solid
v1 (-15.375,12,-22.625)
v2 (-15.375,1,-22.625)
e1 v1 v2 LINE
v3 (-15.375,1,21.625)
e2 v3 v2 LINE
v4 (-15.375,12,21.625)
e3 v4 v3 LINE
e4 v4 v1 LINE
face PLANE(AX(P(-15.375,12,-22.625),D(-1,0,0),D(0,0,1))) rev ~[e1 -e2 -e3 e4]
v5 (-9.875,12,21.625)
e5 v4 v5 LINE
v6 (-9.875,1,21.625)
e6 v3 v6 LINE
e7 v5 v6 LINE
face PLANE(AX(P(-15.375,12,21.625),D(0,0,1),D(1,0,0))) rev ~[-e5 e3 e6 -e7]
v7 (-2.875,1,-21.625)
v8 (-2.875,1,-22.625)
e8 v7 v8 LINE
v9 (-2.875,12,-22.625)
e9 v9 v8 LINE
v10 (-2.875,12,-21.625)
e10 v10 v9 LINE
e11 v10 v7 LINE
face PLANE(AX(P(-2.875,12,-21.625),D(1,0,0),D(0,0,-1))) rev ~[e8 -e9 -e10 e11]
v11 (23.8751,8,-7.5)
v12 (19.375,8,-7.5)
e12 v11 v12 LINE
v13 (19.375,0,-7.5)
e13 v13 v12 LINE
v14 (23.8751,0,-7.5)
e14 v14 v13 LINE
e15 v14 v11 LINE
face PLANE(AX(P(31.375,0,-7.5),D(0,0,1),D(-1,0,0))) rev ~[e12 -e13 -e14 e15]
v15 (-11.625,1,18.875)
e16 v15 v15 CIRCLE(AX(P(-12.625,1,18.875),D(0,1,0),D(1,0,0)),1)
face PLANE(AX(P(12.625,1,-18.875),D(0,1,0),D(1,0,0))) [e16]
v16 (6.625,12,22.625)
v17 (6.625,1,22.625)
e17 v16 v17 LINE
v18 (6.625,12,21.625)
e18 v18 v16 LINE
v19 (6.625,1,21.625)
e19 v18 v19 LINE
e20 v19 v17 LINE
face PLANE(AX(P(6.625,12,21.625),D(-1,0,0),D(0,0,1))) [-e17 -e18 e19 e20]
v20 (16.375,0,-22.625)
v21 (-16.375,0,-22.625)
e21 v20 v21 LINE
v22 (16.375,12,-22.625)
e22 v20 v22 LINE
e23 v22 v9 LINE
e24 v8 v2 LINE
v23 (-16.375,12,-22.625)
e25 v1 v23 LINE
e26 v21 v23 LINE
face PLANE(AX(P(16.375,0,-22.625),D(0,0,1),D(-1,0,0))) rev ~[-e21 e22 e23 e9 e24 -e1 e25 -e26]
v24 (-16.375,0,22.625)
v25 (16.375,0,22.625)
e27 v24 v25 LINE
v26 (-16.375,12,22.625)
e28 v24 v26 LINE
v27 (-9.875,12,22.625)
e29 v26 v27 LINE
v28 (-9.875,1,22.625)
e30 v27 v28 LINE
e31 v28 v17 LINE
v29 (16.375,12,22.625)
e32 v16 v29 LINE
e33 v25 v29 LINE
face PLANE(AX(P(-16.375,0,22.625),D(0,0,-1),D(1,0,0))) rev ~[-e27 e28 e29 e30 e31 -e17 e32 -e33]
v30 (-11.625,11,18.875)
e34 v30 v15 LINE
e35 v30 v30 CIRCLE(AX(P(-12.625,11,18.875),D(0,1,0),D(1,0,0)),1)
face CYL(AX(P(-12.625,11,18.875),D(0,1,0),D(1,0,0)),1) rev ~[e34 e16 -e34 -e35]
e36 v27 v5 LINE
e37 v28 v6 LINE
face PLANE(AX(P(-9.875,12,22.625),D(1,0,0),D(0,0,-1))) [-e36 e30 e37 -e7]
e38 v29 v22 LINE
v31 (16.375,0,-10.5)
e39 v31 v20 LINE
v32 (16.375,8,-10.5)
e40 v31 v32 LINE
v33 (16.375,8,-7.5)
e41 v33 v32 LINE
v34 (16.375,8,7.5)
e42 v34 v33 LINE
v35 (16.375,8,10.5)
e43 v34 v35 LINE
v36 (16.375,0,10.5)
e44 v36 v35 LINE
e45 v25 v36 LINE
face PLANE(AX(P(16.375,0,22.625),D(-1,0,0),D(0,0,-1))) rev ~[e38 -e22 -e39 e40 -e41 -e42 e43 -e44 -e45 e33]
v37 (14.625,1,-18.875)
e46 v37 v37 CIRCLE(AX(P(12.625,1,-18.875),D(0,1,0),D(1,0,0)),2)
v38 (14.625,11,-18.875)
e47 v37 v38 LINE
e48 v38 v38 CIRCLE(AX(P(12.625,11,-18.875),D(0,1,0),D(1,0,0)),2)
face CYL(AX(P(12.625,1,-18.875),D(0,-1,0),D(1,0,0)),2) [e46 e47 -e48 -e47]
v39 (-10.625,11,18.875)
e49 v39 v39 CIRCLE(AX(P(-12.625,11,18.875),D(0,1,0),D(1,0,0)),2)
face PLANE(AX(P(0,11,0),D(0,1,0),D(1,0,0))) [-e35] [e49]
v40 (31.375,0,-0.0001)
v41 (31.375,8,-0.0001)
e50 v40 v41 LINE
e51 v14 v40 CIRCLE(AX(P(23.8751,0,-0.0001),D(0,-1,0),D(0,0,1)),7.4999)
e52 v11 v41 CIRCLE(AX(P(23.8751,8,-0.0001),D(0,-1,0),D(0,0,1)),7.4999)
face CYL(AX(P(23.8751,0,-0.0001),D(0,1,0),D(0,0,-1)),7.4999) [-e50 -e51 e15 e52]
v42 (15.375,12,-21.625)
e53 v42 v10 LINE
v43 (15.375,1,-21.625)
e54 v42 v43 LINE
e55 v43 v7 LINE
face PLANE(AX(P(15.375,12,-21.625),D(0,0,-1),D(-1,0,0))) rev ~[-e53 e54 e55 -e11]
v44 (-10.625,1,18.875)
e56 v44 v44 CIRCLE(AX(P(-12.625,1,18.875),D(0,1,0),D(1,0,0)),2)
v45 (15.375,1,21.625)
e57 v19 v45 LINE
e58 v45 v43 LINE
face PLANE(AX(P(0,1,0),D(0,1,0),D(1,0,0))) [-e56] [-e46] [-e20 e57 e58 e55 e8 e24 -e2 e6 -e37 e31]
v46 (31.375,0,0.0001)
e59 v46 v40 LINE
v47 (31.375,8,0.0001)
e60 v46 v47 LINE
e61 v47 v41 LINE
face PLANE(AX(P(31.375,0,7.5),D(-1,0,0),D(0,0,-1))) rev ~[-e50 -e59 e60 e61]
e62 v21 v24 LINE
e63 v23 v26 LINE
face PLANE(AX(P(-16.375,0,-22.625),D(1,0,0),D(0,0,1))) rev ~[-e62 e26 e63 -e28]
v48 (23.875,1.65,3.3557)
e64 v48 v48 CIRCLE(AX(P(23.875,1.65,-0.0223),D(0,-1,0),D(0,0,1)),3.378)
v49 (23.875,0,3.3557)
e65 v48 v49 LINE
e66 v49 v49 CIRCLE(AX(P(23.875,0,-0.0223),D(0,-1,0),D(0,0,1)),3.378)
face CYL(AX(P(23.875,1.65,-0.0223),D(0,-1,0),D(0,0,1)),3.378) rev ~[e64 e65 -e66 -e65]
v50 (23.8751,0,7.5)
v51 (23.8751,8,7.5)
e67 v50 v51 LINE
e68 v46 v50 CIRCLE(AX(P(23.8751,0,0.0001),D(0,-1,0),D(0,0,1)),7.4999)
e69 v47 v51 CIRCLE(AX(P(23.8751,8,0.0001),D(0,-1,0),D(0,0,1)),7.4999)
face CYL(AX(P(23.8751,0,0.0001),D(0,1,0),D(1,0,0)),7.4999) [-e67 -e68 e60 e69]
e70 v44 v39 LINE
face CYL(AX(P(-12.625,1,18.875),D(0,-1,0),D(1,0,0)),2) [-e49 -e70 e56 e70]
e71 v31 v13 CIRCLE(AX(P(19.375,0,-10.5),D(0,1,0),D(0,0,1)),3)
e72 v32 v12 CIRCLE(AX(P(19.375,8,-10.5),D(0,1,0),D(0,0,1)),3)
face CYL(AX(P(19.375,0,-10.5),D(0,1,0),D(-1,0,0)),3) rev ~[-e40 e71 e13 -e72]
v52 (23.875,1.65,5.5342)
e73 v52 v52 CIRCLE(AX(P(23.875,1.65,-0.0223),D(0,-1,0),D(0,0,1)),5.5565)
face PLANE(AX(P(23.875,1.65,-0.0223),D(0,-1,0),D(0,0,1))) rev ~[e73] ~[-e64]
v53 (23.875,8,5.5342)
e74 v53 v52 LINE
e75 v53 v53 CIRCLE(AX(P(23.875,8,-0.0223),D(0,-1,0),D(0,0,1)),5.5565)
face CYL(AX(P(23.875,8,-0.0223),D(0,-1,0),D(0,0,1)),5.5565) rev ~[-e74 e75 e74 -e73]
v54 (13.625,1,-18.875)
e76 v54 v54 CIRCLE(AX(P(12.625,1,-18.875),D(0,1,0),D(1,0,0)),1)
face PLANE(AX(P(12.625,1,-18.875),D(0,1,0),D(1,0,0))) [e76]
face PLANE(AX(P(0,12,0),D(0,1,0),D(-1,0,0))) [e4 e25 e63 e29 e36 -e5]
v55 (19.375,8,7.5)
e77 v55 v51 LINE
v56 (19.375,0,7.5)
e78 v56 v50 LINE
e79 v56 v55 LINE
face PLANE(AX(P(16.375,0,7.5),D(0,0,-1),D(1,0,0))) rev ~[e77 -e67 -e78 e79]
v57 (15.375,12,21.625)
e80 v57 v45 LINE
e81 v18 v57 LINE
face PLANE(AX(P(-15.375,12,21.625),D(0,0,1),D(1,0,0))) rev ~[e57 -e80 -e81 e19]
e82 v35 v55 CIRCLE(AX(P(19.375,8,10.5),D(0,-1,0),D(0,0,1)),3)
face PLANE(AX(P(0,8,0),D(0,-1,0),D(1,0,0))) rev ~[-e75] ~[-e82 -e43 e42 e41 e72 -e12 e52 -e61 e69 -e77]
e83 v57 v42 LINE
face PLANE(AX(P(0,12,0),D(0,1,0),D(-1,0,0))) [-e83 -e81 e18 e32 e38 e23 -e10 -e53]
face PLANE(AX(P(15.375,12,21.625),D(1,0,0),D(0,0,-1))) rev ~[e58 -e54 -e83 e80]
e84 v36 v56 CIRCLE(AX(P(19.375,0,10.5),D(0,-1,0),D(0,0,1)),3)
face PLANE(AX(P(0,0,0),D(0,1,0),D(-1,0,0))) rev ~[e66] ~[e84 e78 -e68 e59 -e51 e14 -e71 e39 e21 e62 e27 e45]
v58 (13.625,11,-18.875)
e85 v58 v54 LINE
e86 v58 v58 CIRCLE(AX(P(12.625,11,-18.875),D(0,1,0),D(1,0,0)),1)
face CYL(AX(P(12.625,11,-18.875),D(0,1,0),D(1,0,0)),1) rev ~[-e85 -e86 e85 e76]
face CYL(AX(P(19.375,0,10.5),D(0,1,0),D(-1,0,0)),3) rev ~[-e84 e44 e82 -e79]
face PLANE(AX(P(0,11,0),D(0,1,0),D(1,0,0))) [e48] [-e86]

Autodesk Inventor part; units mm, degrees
ref_plane "YZ Plane" through (0, 0, 0) normal (1, 0, 0) x (0, 1, 0)
ref_plane "XZ Plane" through (0, 0, 0) normal (0, 1, 0) x (-1, 0, 0)
ref_plane "XY Plane" through (0, 0, 0) normal (0, 0, 1) x (1, 0, 0)
sketch "Sketch1" plane through (0, 0, 0) normal (0, 1, 0) x (-1, 0, 0)
  line L0 (16.375, 22.625) -> (-16.375, 22.625)
  line L1 (-16.375, 22.625) -> (-16.375, -22.625)
  line L2 (-16.375, -22.625) -> (16.375, -22.625)
  line L3 (16.375, -22.625) -> (16.375, 22.625)
  line L4 (16.375, 22.625) -> (-16.375, -22.625) construction
  line L5 (-16.375, 22.625) -> (16.375, -22.625) construction
  point P0 (0, 0)
  dimension "d0" = 32.75
  dimension "d1" = 45.25
extrude "Extrusion1" add sketch "Sketch1" along normal blind 12
sketch "Sketch2" plane through (0, 12, 0) normal (0, 1, 0) x (1, 0, 0)
  line L0 (-15.375, -21.625) -> (15.375, -21.625)
  line L1 (15.375, -21.625) -> (15.375, 21.625)
  line L2 (15.375, 21.625) -> (-15.375, 21.625)
  line L3 (-15.375, 21.625) -> (-15.375, -21.625)
  line L4 (-15.375, -21.625) -> (15.375, 21.625) construction
  line L5 (15.375, -21.625) -> (-15.375, 21.625) construction
  point P0 (0, 0)
  dimension "d4" = 30.75
  dimension "d5" = 43.25
extrude "Extrusion2" cut sketch "Sketch2" against normal blind 11
sketch "Sketch5" plane through (0, 1, 0) normal (0, 1, 0) x (1, 0, 0)
  circle A0 centre (12.625, 18.875) radius 2
  circle A1 centre (-12.625, -18.875) radius 2
  line L0 (15.375, 21.625) -> (15.375, -21.625) projected
  line L1 (-15.375, 21.625) -> (15.375, 21.625) projected
  line L2 (-15.375, -21.625) -> (-15.375, 21.625) projected
  line L3 (15.375, -21.625) -> (-15.375, -21.625) projected
  point P0 (0, 0)
  dimension "d20" = 4
  dimension "d21" = 2.75
  dimension "d22" = 2.75
  dimension "d23" = 2.75
  dimension "d24" = 2.75
  dimension "d25" = 4
extrude "Extrusion5" add sketch "Sketch5" along normal blind 10 contours A0 | A1
sketch "Sketch6" plane through (12.625, 11, -18.875) normal (0, 1, 0) x (1, 0, 0)
  circle A0 centre (-25.25, -37.75) radius 2 projected
  circle A1 centre (-25.25, -37.75) radius 1
  circle A2 centre (0, 0) radius 2 projected
  circle A3 centre (0, 0) radius 1
  point P0 (-12.625, -18.875)
  dimension "d28" = 2
  dimension "d29" = 2
extrude "Extrusion6" cut sketch "Sketch6" against normal blind 10 contours A1 | A3
sketch "Sketch7" plane through (0, 12, 0) normal (0, 1, 0) x (1, 0, 0)
  line L0 (16.375, 22.625) -> (-16.375, 22.625) projected
  line L1 (-15.375, 21.625) -> (-2.875, 21.625)
  line L2 (-2.875, 21.625) -> (-2.875, 22.625)
  line L3 (-2.875, 22.625) -> (-15.375, 22.625)
  line L4 (-15.375, 22.625) -> (-15.375, 21.625)
  line L5 (15.375, -21.625) -> (-15.375, -21.625) projected
  line L6 (-16.375, -22.625) -> (16.375, -22.625) projected
  line L7 (-9.875, -21.625) -> (6.625, -21.625)
  line L8 (6.625, -21.625) -> (6.625, -22.625)
  line L9 (6.625, -22.625) -> (-9.875, -22.625)
  line L10 (-9.875, -22.625) -> (-9.875, -21.625)
  line L11 (-15.375, -21.625) -> (-15.375, 21.625) projected
  point P0 (0, 0)
  dimension "d32" = 12.5
  dimension "d33" = 5.5
  dimension "d35" = 22
extrude "Extrusion7" cut sketch "Sketch7" against normal blind 11
sketch "Sketch8" plane through (0, 0, 0) normal (0, -1, 0) x (1, 0, 0)
  line L0 (16.375, 22.625) -> (16.375, -22.625) projected
  line L1 (16.375, 7.5) -> (31.375, 7.5)
  line L2 (31.375, 7.5) -> (31.375, -7.5)
  line L3 (31.375, -7.5) -> (16.375, -7.5)
  line L4 (16.375, -7.5) -> (16.375, 7.5)
  point P0 (0, 0)
  dimension "d38" = 15
  dimension "d39" = 7.5
  dimension "d40" = 15
extrude "Extrusion8" add sketch "Sketch8" against normal blind 8
sketch "Sketch9" plane through (0, 8, 0) normal (0, 1, 0) x (1, 0, 0)
  line L0 (31.375, -7.5) -> (31.375, 7.5) projected
  point P0 (0, 0)
  point P1 (23.875, 0.0223)
  dimension "d50" = 7.5
hole "Hole1" at (23.875, 8, -0.0223) direction (0, -1, 0) diameter 6.756 depth 10.9728 tip angle 118 counterbore diameter 11.113 counterbore depth 6.35 clearance for "Socket Head Cap Screw" size "1/4" standard "Ansi Unified Screw Threads"
fillet "Fillet1" radius 3 2 edges at (16.375, 4, -7.5) (16.375, 4, 7.5)
fillet "Fillet2" radius 7.5 2 edges at (31.375, 4, -7.5) (31.375, 4, 7.5)
properties part number "ResonanceBoardEnc"
